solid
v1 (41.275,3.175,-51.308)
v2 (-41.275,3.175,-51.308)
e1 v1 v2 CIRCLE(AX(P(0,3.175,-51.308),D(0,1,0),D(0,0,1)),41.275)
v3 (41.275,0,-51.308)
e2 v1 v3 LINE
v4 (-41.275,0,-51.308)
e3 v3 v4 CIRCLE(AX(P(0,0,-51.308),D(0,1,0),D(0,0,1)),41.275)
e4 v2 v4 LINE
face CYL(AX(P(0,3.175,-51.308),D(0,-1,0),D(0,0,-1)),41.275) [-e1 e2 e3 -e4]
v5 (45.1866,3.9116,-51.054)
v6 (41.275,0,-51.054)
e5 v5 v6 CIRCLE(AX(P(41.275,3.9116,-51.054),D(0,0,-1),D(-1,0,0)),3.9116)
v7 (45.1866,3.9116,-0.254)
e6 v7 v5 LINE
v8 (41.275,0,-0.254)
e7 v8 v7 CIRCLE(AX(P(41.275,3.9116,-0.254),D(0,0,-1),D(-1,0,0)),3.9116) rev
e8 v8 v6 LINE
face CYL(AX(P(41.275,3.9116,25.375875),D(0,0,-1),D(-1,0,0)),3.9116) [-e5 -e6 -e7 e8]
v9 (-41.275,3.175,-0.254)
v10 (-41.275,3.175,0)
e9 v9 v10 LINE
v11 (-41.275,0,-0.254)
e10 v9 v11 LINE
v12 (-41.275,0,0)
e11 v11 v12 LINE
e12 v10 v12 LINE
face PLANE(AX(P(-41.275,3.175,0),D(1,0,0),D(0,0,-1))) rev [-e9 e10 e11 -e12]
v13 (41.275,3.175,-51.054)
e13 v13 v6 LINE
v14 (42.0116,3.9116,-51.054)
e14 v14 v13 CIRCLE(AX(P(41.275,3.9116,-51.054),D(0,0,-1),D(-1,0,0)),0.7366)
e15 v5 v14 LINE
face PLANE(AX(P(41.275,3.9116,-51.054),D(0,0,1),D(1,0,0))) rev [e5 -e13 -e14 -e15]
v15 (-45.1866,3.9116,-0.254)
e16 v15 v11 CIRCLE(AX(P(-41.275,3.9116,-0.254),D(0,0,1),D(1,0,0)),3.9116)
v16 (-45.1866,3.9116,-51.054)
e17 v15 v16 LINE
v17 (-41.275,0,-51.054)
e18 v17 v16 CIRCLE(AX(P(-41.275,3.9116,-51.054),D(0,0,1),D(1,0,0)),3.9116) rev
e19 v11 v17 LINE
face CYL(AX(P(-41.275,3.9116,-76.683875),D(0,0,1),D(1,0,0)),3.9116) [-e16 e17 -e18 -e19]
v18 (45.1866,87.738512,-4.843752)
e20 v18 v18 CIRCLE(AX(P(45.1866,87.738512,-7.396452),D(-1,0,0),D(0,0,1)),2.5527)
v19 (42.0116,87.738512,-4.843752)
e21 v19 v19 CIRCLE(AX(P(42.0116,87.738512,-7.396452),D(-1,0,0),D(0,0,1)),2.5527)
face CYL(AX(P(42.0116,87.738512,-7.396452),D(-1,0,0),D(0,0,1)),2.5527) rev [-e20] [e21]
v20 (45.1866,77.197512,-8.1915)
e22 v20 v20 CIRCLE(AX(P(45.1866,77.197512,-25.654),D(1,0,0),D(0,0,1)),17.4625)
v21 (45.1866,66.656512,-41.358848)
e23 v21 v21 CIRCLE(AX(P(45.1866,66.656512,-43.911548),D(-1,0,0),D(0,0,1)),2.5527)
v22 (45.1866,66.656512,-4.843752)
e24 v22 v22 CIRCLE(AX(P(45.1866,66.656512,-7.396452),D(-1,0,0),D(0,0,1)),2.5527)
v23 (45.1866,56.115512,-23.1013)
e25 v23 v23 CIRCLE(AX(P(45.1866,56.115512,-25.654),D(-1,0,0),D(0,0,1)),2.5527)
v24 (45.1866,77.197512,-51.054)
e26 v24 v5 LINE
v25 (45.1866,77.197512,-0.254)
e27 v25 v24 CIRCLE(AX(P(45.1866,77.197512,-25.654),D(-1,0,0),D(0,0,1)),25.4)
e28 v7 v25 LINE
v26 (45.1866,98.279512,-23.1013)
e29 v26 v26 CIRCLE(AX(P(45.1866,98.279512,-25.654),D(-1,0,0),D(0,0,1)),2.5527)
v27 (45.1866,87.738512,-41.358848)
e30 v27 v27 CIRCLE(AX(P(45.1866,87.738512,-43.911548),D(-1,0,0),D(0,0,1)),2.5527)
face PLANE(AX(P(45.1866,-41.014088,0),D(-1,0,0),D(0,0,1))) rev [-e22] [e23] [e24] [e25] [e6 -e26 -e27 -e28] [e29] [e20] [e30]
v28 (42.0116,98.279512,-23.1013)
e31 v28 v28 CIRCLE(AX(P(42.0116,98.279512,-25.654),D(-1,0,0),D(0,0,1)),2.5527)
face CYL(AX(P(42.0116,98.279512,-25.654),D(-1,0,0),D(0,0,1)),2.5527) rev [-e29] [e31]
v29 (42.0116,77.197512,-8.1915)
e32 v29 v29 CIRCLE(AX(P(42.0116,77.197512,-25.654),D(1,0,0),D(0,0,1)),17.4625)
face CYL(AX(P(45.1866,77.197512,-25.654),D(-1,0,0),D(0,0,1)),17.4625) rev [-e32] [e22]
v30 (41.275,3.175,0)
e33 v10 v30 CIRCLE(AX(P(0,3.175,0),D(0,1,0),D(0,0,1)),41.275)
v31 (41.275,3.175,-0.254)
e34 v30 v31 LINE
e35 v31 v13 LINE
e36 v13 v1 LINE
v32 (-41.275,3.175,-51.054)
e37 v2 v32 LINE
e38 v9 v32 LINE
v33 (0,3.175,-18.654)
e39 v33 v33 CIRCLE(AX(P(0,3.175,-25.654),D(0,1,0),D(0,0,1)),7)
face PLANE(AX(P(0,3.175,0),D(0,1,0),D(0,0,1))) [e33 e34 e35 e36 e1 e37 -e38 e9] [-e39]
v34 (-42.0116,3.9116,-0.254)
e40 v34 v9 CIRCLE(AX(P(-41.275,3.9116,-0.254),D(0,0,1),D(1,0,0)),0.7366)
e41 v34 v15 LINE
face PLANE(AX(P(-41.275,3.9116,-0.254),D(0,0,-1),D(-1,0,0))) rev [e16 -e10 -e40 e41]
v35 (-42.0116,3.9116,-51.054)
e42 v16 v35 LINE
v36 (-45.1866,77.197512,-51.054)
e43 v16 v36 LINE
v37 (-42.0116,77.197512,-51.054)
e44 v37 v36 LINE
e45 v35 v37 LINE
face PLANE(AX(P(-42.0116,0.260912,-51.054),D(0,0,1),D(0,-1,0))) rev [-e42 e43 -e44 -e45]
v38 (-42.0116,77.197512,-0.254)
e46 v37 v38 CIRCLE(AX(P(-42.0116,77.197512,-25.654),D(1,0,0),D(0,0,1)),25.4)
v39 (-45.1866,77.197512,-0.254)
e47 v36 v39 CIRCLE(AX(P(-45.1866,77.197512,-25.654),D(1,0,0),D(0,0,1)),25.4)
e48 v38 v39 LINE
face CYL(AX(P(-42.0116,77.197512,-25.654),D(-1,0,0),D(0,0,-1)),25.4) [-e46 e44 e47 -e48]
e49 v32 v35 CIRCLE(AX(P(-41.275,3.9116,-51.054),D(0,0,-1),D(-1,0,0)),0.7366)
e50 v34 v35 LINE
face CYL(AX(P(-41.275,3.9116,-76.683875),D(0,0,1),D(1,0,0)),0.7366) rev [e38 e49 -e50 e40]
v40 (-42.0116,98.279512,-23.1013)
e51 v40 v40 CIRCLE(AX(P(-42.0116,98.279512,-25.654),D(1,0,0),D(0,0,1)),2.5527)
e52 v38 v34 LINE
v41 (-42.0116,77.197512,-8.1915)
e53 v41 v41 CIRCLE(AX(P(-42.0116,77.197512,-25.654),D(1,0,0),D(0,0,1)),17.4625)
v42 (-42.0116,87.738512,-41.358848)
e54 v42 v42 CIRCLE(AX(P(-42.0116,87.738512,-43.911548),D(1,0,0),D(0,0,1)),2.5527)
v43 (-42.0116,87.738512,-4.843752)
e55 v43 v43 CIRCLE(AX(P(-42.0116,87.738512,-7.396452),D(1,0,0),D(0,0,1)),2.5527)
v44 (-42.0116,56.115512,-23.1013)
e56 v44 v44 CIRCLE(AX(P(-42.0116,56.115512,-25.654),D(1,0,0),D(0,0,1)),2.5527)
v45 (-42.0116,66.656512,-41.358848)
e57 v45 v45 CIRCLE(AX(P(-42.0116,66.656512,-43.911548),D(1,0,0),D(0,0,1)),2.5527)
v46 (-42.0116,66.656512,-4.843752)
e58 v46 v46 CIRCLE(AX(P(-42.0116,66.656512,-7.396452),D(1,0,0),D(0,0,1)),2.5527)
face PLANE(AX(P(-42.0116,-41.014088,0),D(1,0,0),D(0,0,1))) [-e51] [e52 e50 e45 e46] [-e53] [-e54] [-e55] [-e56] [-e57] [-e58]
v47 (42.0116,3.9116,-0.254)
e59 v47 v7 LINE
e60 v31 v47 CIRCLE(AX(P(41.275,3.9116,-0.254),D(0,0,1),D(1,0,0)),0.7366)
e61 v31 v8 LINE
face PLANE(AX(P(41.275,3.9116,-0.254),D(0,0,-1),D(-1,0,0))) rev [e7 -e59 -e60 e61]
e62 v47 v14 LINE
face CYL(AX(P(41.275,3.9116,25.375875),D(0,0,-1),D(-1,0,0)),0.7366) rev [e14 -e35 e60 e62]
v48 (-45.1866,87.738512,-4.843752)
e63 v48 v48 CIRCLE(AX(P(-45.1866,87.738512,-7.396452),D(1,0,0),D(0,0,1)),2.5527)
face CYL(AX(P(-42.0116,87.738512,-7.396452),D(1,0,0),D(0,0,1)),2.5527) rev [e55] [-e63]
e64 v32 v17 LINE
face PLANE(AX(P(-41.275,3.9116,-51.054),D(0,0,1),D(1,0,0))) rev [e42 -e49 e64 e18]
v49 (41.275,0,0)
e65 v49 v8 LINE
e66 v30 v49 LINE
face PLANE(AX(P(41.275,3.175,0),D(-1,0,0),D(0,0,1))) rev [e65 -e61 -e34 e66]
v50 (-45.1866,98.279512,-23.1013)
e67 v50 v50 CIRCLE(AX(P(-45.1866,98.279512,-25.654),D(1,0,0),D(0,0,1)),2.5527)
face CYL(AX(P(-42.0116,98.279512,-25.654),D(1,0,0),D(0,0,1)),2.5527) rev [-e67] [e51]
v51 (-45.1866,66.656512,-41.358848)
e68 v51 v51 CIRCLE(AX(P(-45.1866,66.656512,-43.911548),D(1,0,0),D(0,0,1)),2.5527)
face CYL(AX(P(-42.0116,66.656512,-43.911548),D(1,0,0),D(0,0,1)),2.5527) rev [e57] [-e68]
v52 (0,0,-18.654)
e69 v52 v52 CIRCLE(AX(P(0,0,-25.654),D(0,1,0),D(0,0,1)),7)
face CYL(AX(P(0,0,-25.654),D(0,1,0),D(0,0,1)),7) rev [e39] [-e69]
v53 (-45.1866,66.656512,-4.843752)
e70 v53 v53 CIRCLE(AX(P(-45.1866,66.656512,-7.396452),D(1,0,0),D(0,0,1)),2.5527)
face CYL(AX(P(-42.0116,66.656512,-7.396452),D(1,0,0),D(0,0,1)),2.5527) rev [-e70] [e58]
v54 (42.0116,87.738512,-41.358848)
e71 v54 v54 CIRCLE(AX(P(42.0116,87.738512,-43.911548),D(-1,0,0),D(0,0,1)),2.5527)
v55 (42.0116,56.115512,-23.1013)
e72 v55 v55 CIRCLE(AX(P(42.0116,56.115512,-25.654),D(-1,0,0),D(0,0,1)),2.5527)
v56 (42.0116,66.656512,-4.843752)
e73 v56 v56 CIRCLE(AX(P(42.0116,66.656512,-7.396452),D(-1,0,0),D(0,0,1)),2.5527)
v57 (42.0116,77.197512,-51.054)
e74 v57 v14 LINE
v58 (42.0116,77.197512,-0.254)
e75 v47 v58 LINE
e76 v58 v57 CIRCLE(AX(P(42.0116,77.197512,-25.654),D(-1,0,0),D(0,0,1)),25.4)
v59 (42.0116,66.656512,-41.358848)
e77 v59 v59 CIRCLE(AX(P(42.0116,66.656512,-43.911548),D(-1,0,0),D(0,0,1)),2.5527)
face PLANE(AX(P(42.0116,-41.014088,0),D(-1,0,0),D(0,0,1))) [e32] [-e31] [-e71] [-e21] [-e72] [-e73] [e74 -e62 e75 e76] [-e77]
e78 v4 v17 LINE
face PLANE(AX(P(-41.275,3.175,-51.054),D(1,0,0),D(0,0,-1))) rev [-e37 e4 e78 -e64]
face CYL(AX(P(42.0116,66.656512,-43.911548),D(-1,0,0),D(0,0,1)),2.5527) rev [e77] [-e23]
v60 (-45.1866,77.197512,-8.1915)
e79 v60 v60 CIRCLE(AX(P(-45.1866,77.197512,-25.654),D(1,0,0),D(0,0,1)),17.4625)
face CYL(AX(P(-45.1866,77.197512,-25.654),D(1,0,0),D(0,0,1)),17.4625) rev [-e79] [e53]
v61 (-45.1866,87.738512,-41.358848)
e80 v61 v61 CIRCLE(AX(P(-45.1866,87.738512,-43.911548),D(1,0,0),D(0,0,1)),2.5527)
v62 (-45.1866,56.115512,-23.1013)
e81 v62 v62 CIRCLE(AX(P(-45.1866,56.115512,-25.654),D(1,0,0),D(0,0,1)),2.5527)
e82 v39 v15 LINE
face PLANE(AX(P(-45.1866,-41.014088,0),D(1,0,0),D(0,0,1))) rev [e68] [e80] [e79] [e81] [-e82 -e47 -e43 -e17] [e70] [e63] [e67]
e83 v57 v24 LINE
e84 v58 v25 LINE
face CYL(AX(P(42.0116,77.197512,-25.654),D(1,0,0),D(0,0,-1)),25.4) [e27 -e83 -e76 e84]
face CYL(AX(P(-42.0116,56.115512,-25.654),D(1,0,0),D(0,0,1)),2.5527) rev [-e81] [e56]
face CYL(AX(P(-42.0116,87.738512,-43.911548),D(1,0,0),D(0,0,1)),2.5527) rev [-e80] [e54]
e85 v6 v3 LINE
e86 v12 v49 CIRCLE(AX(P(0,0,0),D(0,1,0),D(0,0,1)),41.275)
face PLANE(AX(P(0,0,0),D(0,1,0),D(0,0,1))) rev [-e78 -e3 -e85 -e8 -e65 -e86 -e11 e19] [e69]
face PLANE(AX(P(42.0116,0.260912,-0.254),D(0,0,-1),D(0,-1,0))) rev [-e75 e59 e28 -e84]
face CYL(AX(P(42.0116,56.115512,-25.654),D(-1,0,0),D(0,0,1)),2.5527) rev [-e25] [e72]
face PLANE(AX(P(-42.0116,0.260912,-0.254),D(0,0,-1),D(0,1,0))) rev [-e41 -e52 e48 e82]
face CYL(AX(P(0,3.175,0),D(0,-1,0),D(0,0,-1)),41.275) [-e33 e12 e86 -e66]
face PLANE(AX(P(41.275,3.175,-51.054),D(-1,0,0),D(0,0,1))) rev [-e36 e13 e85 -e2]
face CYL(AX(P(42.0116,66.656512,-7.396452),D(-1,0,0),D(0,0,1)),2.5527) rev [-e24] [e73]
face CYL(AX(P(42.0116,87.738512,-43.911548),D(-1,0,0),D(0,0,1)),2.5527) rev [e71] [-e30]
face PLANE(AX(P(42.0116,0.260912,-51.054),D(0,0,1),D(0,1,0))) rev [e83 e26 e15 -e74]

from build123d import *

# Parameters (mm, degrees)
BOSS_EXTRUDE1_DEPTH             = 3.175
SKETCH2_R                       = 17.4625
CUT_EXTRUDE1_DEPTH              = 171.897583858
F_10_CLEARANCE_HOLE1_AT_2_COUNT = 2
F_10_CLEARANCE_HOLE1_AT_2_PITCH = 21.082
F_10_CLEARANCE_HOLE1_AT_3_COUNT = 2
F_10_CLEARANCE_HOLE1_AT_3_PITCH = 36.515095125
F_10_CLEARANCE_HOLE1_AT_4_COUNT = 2
F_10_CLEARANCE_HOLE1_AT_4_PITCH = 42.164
F_10_CLEARANCE_HOLE1_AT_5_COUNT = 2
F_10_CLEARANCE_HOLE1_AT_5_PITCH = 36.515095125
F_10_CLEARANCE_HOLE1_AT_6_COUNT = 2
F_10_CLEARANCE_HOLE1_AT_6_PITCH = 21.082
SKETCHED_START                  = -145
SKETCHED_BEND1_OUTLINE_W        = 3.175
SKETCHED_BEND1_OUTLINE_H        = 50.8
SKETCHED_BEND1_DEPTH            = 99.8134
SKETCHED_START_2                = 45.1866
SKETCHED_BEND1_2_OUTLINE_W      = 3.175
SKETCHED_BEND1_2_OUTLINE_H      = 50.8
SKETCHED_BEND1_2_DEPTH          = 99.8134
SKETCHED_START_3                = -44.806157784
SKETCHED_BEND1_3_OUTLINE_R      = 2.5527
SKETCHED_BEND1_3_OUTLINE_R_2    = 17.4625
SKETCHED_BEND1_3_DEPTH          = 2.794557784
SKETCHED_START_4                = 42.0116
SKETCHED_BEND1_4_OUTLINE_R      = 2.5527
SKETCHED_BEND1_4_OUTLINE_R_2    = 17.4625
SKETCHED_BEND1_4_DEPTH          = 2.794557784
SKETCHED_START_5                = -45.1866
SKETCHED_BEND1_5_OUTLINE_R      = 2.5527
SKETCHED_BEND1_5_OUTLINE_R_2    = 17.4625
SKETCHED_BEND1_5_DEPTH          = 3.9116
SKETCHED_START_6                = 41.275
SKETCHED_BEND1_6_OUTLINE_R      = 2.5527
SKETCHED_BEND1_6_OUTLINE_R_2    = 17.4625
SKETCHED_BEND1_6_DEPTH          = 3.9116
SKETCHED_START_7                = -51.054
SKETCHED_BEND1_7_DEPTH          = 50.8
SKETCH7_R                       = 7
CUT_EXTRUDE2_DEPTH              = 144.172192314


with BuildPart() as part:
    # Sketch1 → Boss-Extrude1 (new body)
    with BuildSketch(Plane(origin=(0, 0, 0), x_dir=(1, 0, 0), z_dir=(0, 1, 0))):
        with BuildLine():
            Line((-41.275, 0), (-41.275, 0.254))
            Line((-41.275, 0.254), (-118.2116, 0.254))
            ThreePointArc((-118.2116, 0.254), (-143.6116, 25.654), (-118.2116, 51.054))
            Line((-118.2116, 51.054), (-41.275, 51.054))
            Line((-41.275, 51.054), (-41.275, 51.308))
            ThreePointArc((-41.275, 51.308), (0, 92.583), (41.275, 51.308))
            Line((41.275, 51.308), (41.275, 51.054))
            Line((41.275, 51.054), (118.2116, 51.054))
            ThreePointArc((118.2116, 51.054), (143.6116, 25.654), (118.2116, 0.254))
            Line((118.2116, 0.254), (41.275, 0.254))
            Line((41.275, 0.254), (41.275, 0))
            ThreePointArc((41.275, 0), (0, -41.275), (-41.275, 0))
        make_face()
    extrude(amount=BOSS_EXTRUDE1_DEPTH)

    # Sketch2 → Cut-Extrude1 (cut, through all)
    with BuildSketch(Plane(origin=(0, 3.175, 0), x_dir=(1, 0, 0), z_dir=(0, 1, 0))):
        with Locations(Location((-118.2116, 25.654, 0), (0, 0, 270))):
            Circle(SKETCH2_R)
    cut_extrude1 = extrude(amount=-CUT_EXTRUDE1_DEPTH, mode=Mode.SUBTRACT)

    # Sketch5 → #10 Clearance Hole1 (revolve, cut)
    with BuildSketch(Plane(origin=(-97.1296, 3.175, -25.654), x_dir=(0, 0, 1), z_dir=(1, 0, 0))):
        Polygon((0, 0), (0, 39.633816902), (2.5527, 38.1), (2.5527, 0), align=None)
    f_10_clearance_hole1 = revolve(axis=Axis((-97.1296, 9.525, -25.654), (0, -1, 0)), mode=Mode.SUBTRACT)

    # #10 Clearance Hole1 at 2: #10 Clearance Hole1 ×2
    with Locations(*[Vector(-0.5000000000000003, 0, -0.8660254037844385) * (i * F_10_CLEARANCE_HOLE1_AT_2_PITCH) for i in range(1, F_10_CLEARANCE_HOLE1_AT_2_COUNT)]):
        add(f_10_clearance_hole1, mode=Mode.SUBTRACT)

    # #10 Clearance Hole1 at 3: #10 Clearance Hole1 ×2
    with Locations(*[Vector(-0.8660254037844388, 0, -0.4999999999999998) * (i * F_10_CLEARANCE_HOLE1_AT_3_PITCH) for i in range(1, F_10_CLEARANCE_HOLE1_AT_3_COUNT)]):
        add(f_10_clearance_hole1, mode=Mode.SUBTRACT)

    # #10 Clearance Hole1 at 4: #10 Clearance Hole1 ×2
    with Locations(*[(-i * F_10_CLEARANCE_HOLE1_AT_4_PITCH, 0, 0) for i in range(1, F_10_CLEARANCE_HOLE1_AT_4_COUNT)]):
        add(f_10_clearance_hole1, mode=Mode.SUBTRACT)

    # #10 Clearance Hole1 at 5: #10 Clearance Hole1 ×2
    with Locations(*[Vector(-0.8660254037844386, 0, 0.5000000000000002) * (i * F_10_CLEARANCE_HOLE1_AT_5_PITCH) for i in range(1, F_10_CLEARANCE_HOLE1_AT_5_COUNT)]):
        add(f_10_clearance_hole1, mode=Mode.SUBTRACT)

    # #10 Clearance Hole1 at 6: #10 Clearance Hole1 ×2
    with Locations(*[Vector(-0.5000000000000003, 0, 0.8660254037844385) * (i * F_10_CLEARANCE_HOLE1_AT_6_PITCH) for i in range(1, F_10_CLEARANCE_HOLE1_AT_6_COUNT)]):
        add(f_10_clearance_hole1, mode=Mode.SUBTRACT)

    # Mirror1: Cut-Extrude1, #10 Clearance Hole1 across plane
    add(cut_extrude1.mirror(Plane(origin=(0, 0, 0), x_dir=(0, 0, 1), z_dir=(1, 0, 0))), mode=Mode.SUBTRACT)
    add(f_10_clearance_hole1.mirror(Plane(origin=(0, 0, 0), x_dir=(0, 0, 1), z_dir=(1, 0, 0))), mode=Mode.SUBTRACT)

    # Mirror1 copy 1 sketch → Mirror1 copy 1 (revolve, cut)
    with BuildSketch(Plane(origin=(107.6706, 3.175, -43.911547563), x_dir=(0, 0, 1), z_dir=(-1, 0, 0))):
        Polygon((0, 0), (0, -39.633816902), (2.5527, -38.1), (2.5527, 0), align=None)
    revolve(axis=Axis((107.6706, 9.525, -43.911547563), (0, 1, 0)), mode=Mode.SUBTRACT)

    # Mirror1 copy 2 sketch → Mirror1 copy 2 (revolve, cut)
    with BuildSketch(Plane(origin=(128.7526, 3.175, -43.911547563), x_dir=(0, 0, 1), z_dir=(-1, 0, 0))):
        Polygon((0, 0), (0, -39.633816902), (2.5527, -38.1), (2.5527, 0), align=None)
    revolve(axis=Axis((128.7526, 9.525, -43.911547563), (0, 1, 0)), mode=Mode.SUBTRACT)

    # Mirror1 copy 3 sketch → Mirror1 copy 3 (revolve, cut)
    with BuildSketch(Plane(origin=(139.2936, 3.175, -25.654), x_dir=(0, 0, 1), z_dir=(-1, 0, 0))):
        Polygon((0, 0), (0, -39.633816902), (2.5527, -38.1), (2.5527, 0), align=None)
    revolve(axis=Axis((139.2936, 9.525, -25.654), (0, 1, 0)), mode=Mode.SUBTRACT)

    # Mirror1 copy 4 sketch → Mirror1 copy 4 (revolve, cut)
    with BuildSketch(Plane(origin=(128.7526, 3.175, -7.396452437), x_dir=(0, 0, 1), z_dir=(-1, 0, 0))):
        Polygon((0, 0), (0, -39.633816902), (2.5527, -38.1), (2.5527, 0), align=None)
    revolve(axis=Axis((128.7526, 9.525, -7.396452437), (0, 1, 0)), mode=Mode.SUBTRACT)

    # Mirror1 copy 5 sketch → Mirror1 copy 5 (revolve, cut)
    with BuildSketch(Plane(origin=(107.6706, 3.175, -7.396452437), x_dir=(0, 0, 1), z_dir=(-1, 0, 0))):
        Polygon((0, 0), (0, -39.633816902), (2.5527, -38.1), (2.5527, 0), align=None)
    revolve(axis=Axis((107.6706, 9.525, -7.396452437), (0, 1, 0)), mode=Mode.SUBTRACT)

    # Sketched Bend1: read off the stored shape, not the designer's step
    # Sketched Bend1 outline → Sketched Bend1 (cut)
    with BuildSketch(Plane.YZ.offset(SKETCHED_START)):
        with Locations((1.5875, -25.654)):
            Rectangle(SKETCHED_BEND1_OUTLINE_W, SKETCHED_BEND1_OUTLINE_H)
    extrude(amount=SKETCHED_BEND1_DEPTH, mode=Mode.SUBTRACT)

    # Sketched Bend1 2 outline → Sketched Bend1 2 (cut)
    with BuildSketch(Plane.YZ.offset(SKETCHED_START_2)):
        with Locations((1.5875, -25.654)):
            Rectangle(SKETCHED_BEND1_2_OUTLINE_W, SKETCHED_BEND1_2_OUTLINE_H)
    extrude(amount=SKETCHED_BEND1_2_DEPTH, mode=Mode.SUBTRACT)

    # Sketched Bend1 3 outline → Sketched Bend1 3 (add)
    with BuildSketch(Plane.YZ.offset(SKETCHED_START_3)):
        with BuildLine():
            Line((77.197512257, -0.254), (3.175, -0.254))
            Line((3.175, -0.254), (3.175, -51.054))
            Line((3.175, -51.054), (77.197512257, -51.054))
            ThreePointArc((77.197512257, -51.054), (102.597512257, -25.654), (77.197512257, -0.254))
        make_face()
        with Locations((66.656512257, -43.911547563)):
            Circle(SKETCHED_BEND1_3_OUTLINE_R, mode=Mode.SUBTRACT)
        with Locations((87.738512257, -43.911547563)):
            Circle(SKETCHED_BEND1_3_OUTLINE_R, mode=Mode.SUBTRACT)
        with Locations((56.115512257, -25.654)):
            Circle(SKETCHED_BEND1_3_OUTLINE_R, mode=Mode.SUBTRACT)
        with Locations((77.197512257, -25.654)):
            Circle(SKETCHED_BEND1_3_OUTLINE_R_2, mode=Mode.SUBTRACT)
        with Locations((98.279512257, -25.654)):
            Circle(SKETCHED_BEND1_3_OUTLINE_R, mode=Mode.SUBTRACT)
        with Locations((66.656512257, -7.396452437)):
            Circle(SKETCHED_BEND1_3_OUTLINE_R, mode=Mode.SUBTRACT)
        with Locations((87.738512257, -7.396452437)):
            Circle(SKETCHED_BEND1_3_OUTLINE_R, mode=Mode.SUBTRACT)
    extrude(amount=SKETCHED_BEND1_3_DEPTH)

    # Sketched Bend1 4 outline → Sketched Bend1 4 (add)
    with BuildSketch(Plane.YZ.offset(SKETCHED_START_4)):
        with BuildLine():
            Line((77.197512257, -0.254), (3.175, -0.254))
            Line((3.175, -0.254), (3.175, -51.054))
            Line((3.175, -51.054), (77.197512257, -51.054))
            ThreePointArc((77.197512257, -51.054), (102.597512257, -25.654), (77.197512257, -0.254))
        make_face()
        with Locations((66.656512257, -43.911547563)):
            Circle(SKETCHED_BEND1_4_OUTLINE_R, mode=Mode.SUBTRACT)
        with Locations((87.738512257, -43.911547563)):
            Circle(SKETCHED_BEND1_4_OUTLINE_R, mode=Mode.SUBTRACT)
        with Locations((56.115512257, -25.654)):
            Circle(SKETCHED_BEND1_4_OUTLINE_R, mode=Mode.SUBTRACT)
        with Locations((77.197512257, -25.654)):
            Circle(SKETCHED_BEND1_4_OUTLINE_R_2, mode=Mode.SUBTRACT)
        with Locations((98.279512257, -25.654)):
            Circle(SKETCHED_BEND1_4_OUTLINE_R, mode=Mode.SUBTRACT)
        with Locations((66.656512257, -7.396452437)):
            Circle(SKETCHED_BEND1_4_OUTLINE_R, mode=Mode.SUBTRACT)
        with Locations((87.738512257, -7.396452437)):
            Circle(SKETCHED_BEND1_4_OUTLINE_R, mode=Mode.SUBTRACT)
    extrude(amount=SKETCHED_BEND1_4_DEPTH)

    # Sketched Bend1 5 outline → Sketched Bend1 5 (add)
    with BuildSketch(Plane.YZ.offset(SKETCHED_START_5)):
        with BuildLine():
            Line((77.197512257, -0.254), (3.175, -0.254))
            Line((3.175, -0.254), (3.175, -51.054))
            Line((3.175, -51.054), (77.197512257, -51.054))
            ThreePointArc((77.197512257, -51.054), (102.597512257, -25.654), (77.197512257, -0.254))
        make_face()
        with Locations((66.656512257, -43.911547563)):
            Circle(SKETCHED_BEND1_5_OUTLINE_R, mode=Mode.SUBTRACT)
        with Locations((87.738512257, -43.911547563)):
            Circle(SKETCHED_BEND1_5_OUTLINE_R, mode=Mode.SUBTRACT)
        with Locations((56.115512257, -25.654)):
            Circle(SKETCHED_BEND1_5_OUTLINE_R, mode=Mode.SUBTRACT)
        with Locations((77.197512257, -25.654)):
            Circle(SKETCHED_BEND1_5_OUTLINE_R_2, mode=Mode.SUBTRACT)
        with Locations((98.279512257, -25.654)):
            Circle(SKETCHED_BEND1_5_OUTLINE_R, mode=Mode.SUBTRACT)
        with Locations((66.656512257, -7.396452437)):
            Circle(SKETCHED_BEND1_5_OUTLINE_R, mode=Mode.SUBTRACT)
        with Locations((87.738512257, -7.396452437)):
            Circle(SKETCHED_BEND1_5_OUTLINE_R, mode=Mode.SUBTRACT)
    extrude(amount=SKETCHED_BEND1_5_DEPTH)

    # Sketched Bend1 6 outline → Sketched Bend1 6 (add)
    with BuildSketch(Plane.YZ.offset(SKETCHED_START_6)):
        with BuildLine():
            Line((77.197512257, -0.254), (3.175, -0.254))
            Line((3.175, -0.254), (3.175, -51.054))
            Line((3.175, -51.054), (77.197512257, -51.054))
            ThreePointArc((77.197512257, -51.054), (102.597512257, -25.654), (77.197512257, -0.254))
        make_face()
        with Locations((66.656512257, -43.911547563)):
            Circle(SKETCHED_BEND1_6_OUTLINE_R, mode=Mode.SUBTRACT)
        with Locations((87.738512257, -43.911547563)):
            Circle(SKETCHED_BEND1_6_OUTLINE_R, mode=Mode.SUBTRACT)
        with Locations((56.115512257, -25.654)):
            Circle(SKETCHED_BEND1_6_OUTLINE_R, mode=Mode.SUBTRACT)
        with Locations((77.197512257, -25.654)):
            Circle(SKETCHED_BEND1_6_OUTLINE_R_2, mode=Mode.SUBTRACT)
        with Locations((98.279512257, -25.654)):
            Circle(SKETCHED_BEND1_6_OUTLINE_R, mode=Mode.SUBTRACT)
        with Locations((66.656512257, -7.396452437)):
            Circle(SKETCHED_BEND1_6_OUTLINE_R, mode=Mode.SUBTRACT)
        with Locations((87.738512257, -7.396452437)):
            Circle(SKETCHED_BEND1_6_OUTLINE_R, mode=Mode.SUBTRACT)
    extrude(amount=SKETCHED_BEND1_6_DEPTH)

    # Sketched Bend1 7 outline → Sketched Bend1 7 (cut)
    with BuildSketch(Plane.XY.offset(SKETCHED_START_7)):
        with BuildLine():
            Line((-42.0116, 104), (-42.0116, 3.9116))
            ThreePointArc((-42.0116, 3.9116), (-41.795854855, 3.390745145), (-41.275, 3.175))
            Line((-41.275, 3.175), (-41.275, 104))
            Line((-41.275, 104), (-42.0116, 104))
        make_face()
        with BuildLine():
            Line((-45.1866, 3.9116), (-45.186600025, 104))
            Line((-45.186600025, 104), (-47, 104))
            Line((-47, 104), (-47, -2.2e-08))
            Line((-47, -2.2e-08), (-41.275, 0))
            ThreePointArc((-41.275, 0), (-44.040918885, 1.145681115), (-45.1866, 3.9116))
        make_face()
        with BuildLine():
            Line((42.0116, 104), (41.275, 104))
            Line((41.275, 104), (41.275, 3.175))
            ThreePointArc((41.275, 3.175), (41.795854855, 3.390745145), (42.0116, 3.9116))
            Line((42.0116, 3.9116), (42.0116, 104))
        make_face()
        with BuildLine():
            Line((47, 104), (45.186600025, 104))
            Line((45.186600025, 104), (45.1866, 3.9116))
            ThreePointArc((45.1866, 3.9116), (44.040918885, 1.145681115), (41.275, 0))
            Line((41.275, 0), (47, -2.2e-08))
            Line((47, -2.2e-08), (47, 104))
        make_face()
    extrude(amount=SKETCHED_BEND1_7_DEPTH, mode=Mode.SUBTRACT)

    # Sketch7 → Cut-Extrude2 (cut, through all)
    with BuildSketch(Plane(origin=(0, 3.175, 0), x_dir=(1, 0, 0), z_dir=(0, 1, 0))):
        with Locations(Location((0, 25.654, 0), (0, 0, 270))):
            Circle(SKETCH7_R)
    extrude(amount=-CUT_EXTRUDE2_DEPTH, mode=Mode.SUBTRACT)


solid = part.part
